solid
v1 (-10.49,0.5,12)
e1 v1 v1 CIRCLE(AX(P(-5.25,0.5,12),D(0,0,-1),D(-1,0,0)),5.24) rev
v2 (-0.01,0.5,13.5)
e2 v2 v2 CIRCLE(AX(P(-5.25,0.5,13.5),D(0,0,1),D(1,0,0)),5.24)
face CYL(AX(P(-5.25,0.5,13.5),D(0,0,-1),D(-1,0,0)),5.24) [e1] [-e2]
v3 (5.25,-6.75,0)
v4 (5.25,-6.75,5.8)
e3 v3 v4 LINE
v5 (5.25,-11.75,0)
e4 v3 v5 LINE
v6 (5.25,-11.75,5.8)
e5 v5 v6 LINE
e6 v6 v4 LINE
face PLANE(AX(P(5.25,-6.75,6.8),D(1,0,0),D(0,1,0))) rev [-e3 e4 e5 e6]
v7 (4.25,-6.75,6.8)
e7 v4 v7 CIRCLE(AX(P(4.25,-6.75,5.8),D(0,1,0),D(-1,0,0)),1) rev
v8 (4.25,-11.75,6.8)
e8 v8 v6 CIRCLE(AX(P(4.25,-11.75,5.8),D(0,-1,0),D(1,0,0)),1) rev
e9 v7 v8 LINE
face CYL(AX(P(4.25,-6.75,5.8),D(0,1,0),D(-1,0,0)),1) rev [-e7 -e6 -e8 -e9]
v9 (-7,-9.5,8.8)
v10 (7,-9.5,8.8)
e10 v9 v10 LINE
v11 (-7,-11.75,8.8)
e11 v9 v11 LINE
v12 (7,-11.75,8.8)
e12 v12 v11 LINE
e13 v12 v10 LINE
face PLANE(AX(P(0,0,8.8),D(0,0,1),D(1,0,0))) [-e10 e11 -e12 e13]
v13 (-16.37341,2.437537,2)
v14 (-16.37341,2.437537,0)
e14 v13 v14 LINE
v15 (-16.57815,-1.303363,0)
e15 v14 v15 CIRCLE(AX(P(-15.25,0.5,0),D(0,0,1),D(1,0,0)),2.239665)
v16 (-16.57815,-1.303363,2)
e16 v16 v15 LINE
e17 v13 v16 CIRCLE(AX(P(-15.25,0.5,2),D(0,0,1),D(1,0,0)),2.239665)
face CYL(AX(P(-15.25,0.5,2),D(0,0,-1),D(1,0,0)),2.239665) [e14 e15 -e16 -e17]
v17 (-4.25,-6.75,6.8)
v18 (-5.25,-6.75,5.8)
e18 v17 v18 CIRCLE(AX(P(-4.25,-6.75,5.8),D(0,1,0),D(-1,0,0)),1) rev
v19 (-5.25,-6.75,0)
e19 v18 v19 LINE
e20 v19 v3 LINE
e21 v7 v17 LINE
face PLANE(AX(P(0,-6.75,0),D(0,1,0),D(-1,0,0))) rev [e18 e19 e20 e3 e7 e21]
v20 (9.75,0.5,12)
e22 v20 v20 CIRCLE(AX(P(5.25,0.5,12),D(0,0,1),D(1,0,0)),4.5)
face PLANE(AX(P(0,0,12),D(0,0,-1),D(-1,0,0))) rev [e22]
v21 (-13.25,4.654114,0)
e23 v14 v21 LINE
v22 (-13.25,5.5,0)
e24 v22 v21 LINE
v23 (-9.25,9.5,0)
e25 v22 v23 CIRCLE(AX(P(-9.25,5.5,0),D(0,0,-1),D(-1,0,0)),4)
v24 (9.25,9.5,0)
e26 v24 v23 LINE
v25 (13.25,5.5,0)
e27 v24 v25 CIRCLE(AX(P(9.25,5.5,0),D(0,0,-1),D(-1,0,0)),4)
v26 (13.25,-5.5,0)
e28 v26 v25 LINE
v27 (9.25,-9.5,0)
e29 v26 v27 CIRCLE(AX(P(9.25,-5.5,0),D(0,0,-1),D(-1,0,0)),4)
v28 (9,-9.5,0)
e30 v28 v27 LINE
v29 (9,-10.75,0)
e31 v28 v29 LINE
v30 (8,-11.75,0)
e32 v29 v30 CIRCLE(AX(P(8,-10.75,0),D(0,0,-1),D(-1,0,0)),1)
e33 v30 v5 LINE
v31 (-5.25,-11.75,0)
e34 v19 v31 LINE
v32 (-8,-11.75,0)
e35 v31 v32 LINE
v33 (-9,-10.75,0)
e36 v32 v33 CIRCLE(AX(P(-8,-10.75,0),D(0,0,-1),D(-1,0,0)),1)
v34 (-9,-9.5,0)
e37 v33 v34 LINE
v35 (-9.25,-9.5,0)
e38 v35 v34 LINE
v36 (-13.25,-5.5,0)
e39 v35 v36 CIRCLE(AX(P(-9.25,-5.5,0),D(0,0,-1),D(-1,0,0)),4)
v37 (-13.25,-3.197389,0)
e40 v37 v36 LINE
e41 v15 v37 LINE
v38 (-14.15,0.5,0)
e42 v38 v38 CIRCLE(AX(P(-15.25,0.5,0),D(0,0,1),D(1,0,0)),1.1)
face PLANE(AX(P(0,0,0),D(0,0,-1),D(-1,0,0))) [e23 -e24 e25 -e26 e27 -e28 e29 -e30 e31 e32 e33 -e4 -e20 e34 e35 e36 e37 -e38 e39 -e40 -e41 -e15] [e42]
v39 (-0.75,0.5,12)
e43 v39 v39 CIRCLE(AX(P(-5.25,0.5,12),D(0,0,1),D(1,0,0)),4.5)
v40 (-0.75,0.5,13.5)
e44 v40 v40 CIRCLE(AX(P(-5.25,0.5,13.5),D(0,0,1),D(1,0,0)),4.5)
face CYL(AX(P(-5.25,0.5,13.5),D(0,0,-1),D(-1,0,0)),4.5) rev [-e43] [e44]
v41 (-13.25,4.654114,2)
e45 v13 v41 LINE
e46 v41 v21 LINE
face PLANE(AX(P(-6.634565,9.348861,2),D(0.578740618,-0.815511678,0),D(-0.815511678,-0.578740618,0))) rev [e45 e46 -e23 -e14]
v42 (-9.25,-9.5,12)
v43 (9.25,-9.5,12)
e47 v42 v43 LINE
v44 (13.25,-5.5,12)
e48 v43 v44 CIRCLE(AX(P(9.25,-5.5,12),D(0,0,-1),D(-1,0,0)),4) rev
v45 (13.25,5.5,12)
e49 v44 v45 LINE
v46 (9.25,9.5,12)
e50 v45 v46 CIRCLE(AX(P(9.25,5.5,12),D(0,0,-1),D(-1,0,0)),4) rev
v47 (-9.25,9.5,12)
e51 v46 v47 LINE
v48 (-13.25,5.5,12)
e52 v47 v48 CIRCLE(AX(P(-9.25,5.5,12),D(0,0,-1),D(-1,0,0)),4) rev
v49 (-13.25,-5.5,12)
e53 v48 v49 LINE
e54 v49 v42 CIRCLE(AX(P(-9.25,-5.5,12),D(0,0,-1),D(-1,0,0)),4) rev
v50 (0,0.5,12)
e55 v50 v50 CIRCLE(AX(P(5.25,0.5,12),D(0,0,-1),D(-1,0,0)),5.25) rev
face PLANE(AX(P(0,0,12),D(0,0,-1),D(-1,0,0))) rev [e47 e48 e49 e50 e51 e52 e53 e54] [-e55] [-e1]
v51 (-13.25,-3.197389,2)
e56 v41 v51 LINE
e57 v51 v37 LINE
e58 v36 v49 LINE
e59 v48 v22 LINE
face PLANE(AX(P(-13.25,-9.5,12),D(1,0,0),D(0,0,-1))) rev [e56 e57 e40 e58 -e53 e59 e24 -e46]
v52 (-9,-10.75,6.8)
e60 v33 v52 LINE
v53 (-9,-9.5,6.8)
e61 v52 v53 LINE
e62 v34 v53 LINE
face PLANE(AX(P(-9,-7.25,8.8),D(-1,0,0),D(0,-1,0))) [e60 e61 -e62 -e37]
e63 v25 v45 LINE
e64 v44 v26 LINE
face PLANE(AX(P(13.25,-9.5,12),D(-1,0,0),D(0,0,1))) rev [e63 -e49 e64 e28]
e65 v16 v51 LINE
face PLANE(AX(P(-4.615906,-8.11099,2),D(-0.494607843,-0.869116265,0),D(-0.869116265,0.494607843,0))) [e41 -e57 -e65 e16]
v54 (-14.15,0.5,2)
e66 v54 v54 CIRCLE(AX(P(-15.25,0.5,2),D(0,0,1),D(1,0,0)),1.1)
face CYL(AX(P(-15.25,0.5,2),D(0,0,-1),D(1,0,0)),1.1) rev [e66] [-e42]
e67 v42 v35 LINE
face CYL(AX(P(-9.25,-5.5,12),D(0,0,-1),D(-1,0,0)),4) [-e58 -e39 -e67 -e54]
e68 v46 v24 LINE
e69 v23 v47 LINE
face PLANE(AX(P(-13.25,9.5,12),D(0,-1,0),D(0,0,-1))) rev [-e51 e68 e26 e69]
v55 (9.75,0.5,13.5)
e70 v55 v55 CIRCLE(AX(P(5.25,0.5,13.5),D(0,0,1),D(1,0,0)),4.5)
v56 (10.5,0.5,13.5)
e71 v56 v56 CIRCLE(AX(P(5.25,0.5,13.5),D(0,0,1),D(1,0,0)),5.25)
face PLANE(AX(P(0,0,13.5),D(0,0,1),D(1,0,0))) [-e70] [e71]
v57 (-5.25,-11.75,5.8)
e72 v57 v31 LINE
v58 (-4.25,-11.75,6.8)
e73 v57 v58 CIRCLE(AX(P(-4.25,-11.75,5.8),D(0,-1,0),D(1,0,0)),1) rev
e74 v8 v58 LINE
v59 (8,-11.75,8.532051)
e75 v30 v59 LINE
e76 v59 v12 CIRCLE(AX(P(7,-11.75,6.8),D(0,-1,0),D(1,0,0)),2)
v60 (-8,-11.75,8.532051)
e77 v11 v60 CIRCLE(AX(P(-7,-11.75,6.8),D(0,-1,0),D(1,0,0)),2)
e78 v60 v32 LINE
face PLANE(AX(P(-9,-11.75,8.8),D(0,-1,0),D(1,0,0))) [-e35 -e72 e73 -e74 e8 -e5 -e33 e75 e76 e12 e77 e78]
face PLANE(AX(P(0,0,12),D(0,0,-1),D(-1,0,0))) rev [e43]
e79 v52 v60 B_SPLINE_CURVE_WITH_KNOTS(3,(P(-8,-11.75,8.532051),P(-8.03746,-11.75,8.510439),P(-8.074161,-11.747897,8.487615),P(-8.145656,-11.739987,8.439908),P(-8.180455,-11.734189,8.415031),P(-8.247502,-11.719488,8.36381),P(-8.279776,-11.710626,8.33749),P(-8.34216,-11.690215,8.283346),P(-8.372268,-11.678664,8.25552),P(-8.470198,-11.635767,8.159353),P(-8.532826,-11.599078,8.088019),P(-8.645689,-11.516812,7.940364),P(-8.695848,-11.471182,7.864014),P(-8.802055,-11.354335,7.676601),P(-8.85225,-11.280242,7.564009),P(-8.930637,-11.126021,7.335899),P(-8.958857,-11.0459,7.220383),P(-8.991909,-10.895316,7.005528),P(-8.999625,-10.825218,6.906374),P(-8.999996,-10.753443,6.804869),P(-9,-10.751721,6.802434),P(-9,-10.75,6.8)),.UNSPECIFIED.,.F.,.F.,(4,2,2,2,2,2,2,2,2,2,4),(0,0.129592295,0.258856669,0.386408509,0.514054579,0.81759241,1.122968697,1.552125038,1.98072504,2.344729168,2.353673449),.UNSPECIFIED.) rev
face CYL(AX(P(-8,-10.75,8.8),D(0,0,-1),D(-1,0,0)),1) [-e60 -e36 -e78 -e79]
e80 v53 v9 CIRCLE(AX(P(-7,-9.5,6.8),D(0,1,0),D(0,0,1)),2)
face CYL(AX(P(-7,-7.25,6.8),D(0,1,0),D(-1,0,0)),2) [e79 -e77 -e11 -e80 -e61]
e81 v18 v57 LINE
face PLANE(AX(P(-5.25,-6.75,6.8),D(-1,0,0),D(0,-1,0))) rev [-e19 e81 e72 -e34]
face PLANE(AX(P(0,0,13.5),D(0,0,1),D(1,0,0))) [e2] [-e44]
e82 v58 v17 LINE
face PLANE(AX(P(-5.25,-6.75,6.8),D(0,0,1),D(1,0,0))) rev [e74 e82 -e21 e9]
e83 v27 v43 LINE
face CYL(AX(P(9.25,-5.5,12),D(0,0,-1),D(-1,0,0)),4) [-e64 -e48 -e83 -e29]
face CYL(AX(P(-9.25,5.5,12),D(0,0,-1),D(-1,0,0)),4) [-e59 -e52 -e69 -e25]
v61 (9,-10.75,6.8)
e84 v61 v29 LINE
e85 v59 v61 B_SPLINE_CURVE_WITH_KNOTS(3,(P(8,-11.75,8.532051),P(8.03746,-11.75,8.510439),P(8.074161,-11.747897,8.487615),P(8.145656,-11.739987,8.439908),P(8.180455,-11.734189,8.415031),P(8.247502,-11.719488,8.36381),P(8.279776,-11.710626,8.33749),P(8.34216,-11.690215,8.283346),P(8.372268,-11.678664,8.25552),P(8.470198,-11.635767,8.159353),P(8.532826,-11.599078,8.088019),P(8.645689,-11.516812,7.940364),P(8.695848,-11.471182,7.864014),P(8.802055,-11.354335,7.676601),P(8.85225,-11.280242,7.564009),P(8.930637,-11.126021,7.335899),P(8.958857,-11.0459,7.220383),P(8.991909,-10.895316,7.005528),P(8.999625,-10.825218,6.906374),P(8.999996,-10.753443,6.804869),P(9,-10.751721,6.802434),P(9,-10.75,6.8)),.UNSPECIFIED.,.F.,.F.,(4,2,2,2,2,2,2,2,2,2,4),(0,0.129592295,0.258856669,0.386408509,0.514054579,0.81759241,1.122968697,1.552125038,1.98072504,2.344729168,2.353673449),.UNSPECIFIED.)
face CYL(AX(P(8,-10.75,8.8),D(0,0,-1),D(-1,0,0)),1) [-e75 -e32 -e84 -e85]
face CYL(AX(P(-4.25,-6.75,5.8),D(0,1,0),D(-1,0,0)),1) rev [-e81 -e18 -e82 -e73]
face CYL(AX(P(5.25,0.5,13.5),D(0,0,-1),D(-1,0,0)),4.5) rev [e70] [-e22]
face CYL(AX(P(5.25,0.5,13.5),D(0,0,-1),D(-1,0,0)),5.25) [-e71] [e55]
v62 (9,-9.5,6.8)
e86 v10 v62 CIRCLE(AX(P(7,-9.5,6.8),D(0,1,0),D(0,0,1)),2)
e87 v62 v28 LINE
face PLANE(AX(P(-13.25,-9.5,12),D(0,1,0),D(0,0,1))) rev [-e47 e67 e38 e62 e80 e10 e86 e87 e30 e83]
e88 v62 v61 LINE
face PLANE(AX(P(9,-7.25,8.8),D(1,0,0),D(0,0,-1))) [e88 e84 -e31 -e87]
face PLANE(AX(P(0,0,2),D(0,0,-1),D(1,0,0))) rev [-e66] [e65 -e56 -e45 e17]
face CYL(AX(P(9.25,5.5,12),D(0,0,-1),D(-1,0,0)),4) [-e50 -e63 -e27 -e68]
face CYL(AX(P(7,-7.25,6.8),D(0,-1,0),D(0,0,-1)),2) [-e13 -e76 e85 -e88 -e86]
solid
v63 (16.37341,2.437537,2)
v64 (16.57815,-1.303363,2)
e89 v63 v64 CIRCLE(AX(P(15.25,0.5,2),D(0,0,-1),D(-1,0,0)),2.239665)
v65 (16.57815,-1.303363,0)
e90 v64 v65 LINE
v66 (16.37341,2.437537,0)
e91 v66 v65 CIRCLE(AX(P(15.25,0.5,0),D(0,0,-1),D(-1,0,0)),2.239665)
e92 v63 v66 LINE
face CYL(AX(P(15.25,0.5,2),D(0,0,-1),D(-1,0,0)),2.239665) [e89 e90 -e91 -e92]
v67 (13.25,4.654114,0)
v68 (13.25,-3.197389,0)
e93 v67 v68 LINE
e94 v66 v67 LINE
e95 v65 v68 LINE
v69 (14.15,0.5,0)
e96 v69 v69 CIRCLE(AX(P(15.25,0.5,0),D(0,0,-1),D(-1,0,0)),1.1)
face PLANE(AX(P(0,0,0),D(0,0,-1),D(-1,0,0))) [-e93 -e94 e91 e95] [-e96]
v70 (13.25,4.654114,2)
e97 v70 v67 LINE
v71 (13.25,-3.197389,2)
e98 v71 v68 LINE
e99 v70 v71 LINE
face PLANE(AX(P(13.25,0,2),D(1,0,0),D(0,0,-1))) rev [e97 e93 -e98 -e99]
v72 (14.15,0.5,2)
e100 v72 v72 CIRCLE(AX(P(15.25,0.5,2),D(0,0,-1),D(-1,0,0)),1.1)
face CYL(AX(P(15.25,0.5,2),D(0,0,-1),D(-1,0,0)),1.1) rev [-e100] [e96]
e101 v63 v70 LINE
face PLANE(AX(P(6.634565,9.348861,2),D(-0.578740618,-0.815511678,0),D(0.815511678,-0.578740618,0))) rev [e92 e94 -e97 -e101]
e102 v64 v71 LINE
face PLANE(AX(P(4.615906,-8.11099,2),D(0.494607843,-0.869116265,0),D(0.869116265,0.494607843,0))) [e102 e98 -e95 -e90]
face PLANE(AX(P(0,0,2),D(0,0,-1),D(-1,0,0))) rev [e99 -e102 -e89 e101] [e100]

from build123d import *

# Parameters (mm, degrees)
SKETCH_1_W          = 26.5
SKETCH_1_H          = 19
EXTRUDE_1_DEPTH     = 12
SKETCH_2_R          = 5.25
SKETCH_2_R_2        = 4.5
EXTRUDE_6_DEPTH     = 1.5
FILLET_1_R          = 4
SKETCH_3_R          = 1.1
EXTRUDE_7_DEPTH     = 2
SKETCH_4_R          = 5.24
SKETCH_4_R_2        = 4.5
EXTRUDE_11_DEPTH    = 1.5
SKETCH_5_W          = 18
SKETCH_5_H          = 4.5
EXTRUDE_12_DEPTH    = 8.8
FILLET_2_R          = 2
FILLET_3_R          = 1
SKETCH_6_W          = 10.5
SKETCH_6_H          = 6.8
CUT_EXTRUDE_1_DEPTH = 5
FILLET_4_R          = 1


with BuildPart() as part:
    # 草图1 → 凸台-拉伸1 (new body)
    with BuildSketch(Plane.XY):
        Rectangle(SKETCH_1_W, SKETCH_1_H)
    extrude(amount=EXTRUDE_1_DEPTH)

    # 草图2 → 凸台-拉伸6 (add)
    with BuildSketch(Plane.XY.offset(12)):
        with Locations(Location((5.25, 0.5, 0), (0, 0, 180))):
            Circle(SKETCH_2_R)
        with Locations((5.25, 0.5)):
            Circle(SKETCH_2_R_2, mode=Mode.SUBTRACT)
    extrude(amount=EXTRUDE_6_DEPTH)

    # 圆角1
    fillet_1_edges = [part.edges().sort_by_distance(p)[0] for p in [
        (13.25, -9.5, 6),
        (-13.25, -9.5, 6),
        (-13.25, 9.5, 6),
        (13.25, 9.5, 6),
    ]]
    fillet(fillet_1_edges, radius=FILLET_1_R)


with BuildPart() as body_2:
    # 草图3 → 凸台-拉伸7 (new body)
    with BuildSketch(Plane(origin=(0, 0, 0), x_dir=(-1, 0, 0), z_dir=(0, 0, -1))):
        with BuildLine():
            Line((-13.25, -3.197389306), (-13.25, 0.5))
            Line((-13.25, 0.5), (-13.25, 4.65411399))
            Line((-13.25, 4.65411399), (-16.373409728, 2.437537425))
            ThreePointArc((-16.373409728, 2.437537425), (-17.486318468, 0.622394439), (-16.578150415, -1.303362738))
            Line((-16.578150415, -1.303362738), (-13.25, -3.197389306))
        make_face()
        with Locations((-15.25, 0.5)):
            Circle(SKETCH_3_R, mode=Mode.SUBTRACT)
    extrude_7 = extrude(amount=-EXTRUDE_7_DEPTH)


with BuildPart() as part_1:
    add(part.part)

    # 镜向3: 凸台-拉伸7 across plane
    add(extrude_7.mirror(Plane(origin=(0, 0, 0), x_dir=(0, 0, 1), z_dir=(1, 0, 0))))

    # 草图4 → 凸台-拉伸11 (add)
    with BuildSketch(Plane.XY.offset(12)):
        with Locations(Location((-5.25, 0.5, 0), (0, 0, 180))):
            Circle(SKETCH_4_R)
        with Locations((-5.25, 0.5)):
            Circle(SKETCH_4_R_2, mode=Mode.SUBTRACT)
    extrude(amount=EXTRUDE_11_DEPTH)

    # 草图5 → 凸台-拉伸12 (add)
    with BuildSketch(Plane(origin=(0, 0, 0), x_dir=(-1, 0, 0), z_dir=(0, 0, -1))):
        with Locations((0, -9.5)):
            Rectangle(SKETCH_5_W, SKETCH_5_H)
    extrude(amount=-EXTRUDE_12_DEPTH)

    # 圆角2
    fillet_2_edges = [part_1.edges().sort_by_distance(p)[0] for p in [
        (9, -10.625, 8.8),
        (-9, -10.625, 8.8),
    ]]
    fillet(fillet_2_edges, radius=FILLET_2_R)

    # 圆角3
    # the kernel refuses this fillet: 1 mm, written as the material it takes off along each edge
    with BuildSketch(Plane(origin=(-9, -11.75, -2.5), x_dir=(0, 1, 0), z_dir=(0, 0, 1))) as fillet_3_piece_1:
        with BuildLine():
            CenterArc((FILLET_3_R, -FILLET_3_R), FILLET_3_R, 90, 90)
            Line((0, -FILLET_3_R), (0, 0))
            Line((0, 0), (FILLET_3_R, 0))
        make_face()
    extrude(amount=11.8, mode=Mode.SUBTRACT)
    with BuildSketch(Plane(origin=(9, -11.75, -2.5), x_dir=(0, 1, 0), z_dir=(0, 0, 1))) as fillet_3_piece_2:
        with BuildLine():
            CenterArc((FILLET_3_R, FILLET_3_R), FILLET_3_R, 180, 90)
            Line((0, FILLET_3_R), (0, 0))
            Line((0, 0), (FILLET_3_R, 0))
        make_face()
    extrude(amount=11.8, mode=Mode.SUBTRACT)

    # 草图6 → 切除-拉伸1 (cut)
    with BuildSketch(Plane.XZ.offset(11.75)):
        with Locations((0, 3.4)):
            Rectangle(SKETCH_6_W, SKETCH_6_H)
    extrude(amount=-CUT_EXTRUDE_1_DEPTH, mode=Mode.SUBTRACT)

    # 圆角4
    fillet_4_edges = [part_1.edges().sort_by_distance(p)[0] for p in [
        (-5.25, -9.25, 6.8),
        (5.25, -9.25, 6.8),
    ]]
    fillet(fillet_4_edges, radius=FILLET_4_R)


solid = Compound([body_2.part, part_1.part])
